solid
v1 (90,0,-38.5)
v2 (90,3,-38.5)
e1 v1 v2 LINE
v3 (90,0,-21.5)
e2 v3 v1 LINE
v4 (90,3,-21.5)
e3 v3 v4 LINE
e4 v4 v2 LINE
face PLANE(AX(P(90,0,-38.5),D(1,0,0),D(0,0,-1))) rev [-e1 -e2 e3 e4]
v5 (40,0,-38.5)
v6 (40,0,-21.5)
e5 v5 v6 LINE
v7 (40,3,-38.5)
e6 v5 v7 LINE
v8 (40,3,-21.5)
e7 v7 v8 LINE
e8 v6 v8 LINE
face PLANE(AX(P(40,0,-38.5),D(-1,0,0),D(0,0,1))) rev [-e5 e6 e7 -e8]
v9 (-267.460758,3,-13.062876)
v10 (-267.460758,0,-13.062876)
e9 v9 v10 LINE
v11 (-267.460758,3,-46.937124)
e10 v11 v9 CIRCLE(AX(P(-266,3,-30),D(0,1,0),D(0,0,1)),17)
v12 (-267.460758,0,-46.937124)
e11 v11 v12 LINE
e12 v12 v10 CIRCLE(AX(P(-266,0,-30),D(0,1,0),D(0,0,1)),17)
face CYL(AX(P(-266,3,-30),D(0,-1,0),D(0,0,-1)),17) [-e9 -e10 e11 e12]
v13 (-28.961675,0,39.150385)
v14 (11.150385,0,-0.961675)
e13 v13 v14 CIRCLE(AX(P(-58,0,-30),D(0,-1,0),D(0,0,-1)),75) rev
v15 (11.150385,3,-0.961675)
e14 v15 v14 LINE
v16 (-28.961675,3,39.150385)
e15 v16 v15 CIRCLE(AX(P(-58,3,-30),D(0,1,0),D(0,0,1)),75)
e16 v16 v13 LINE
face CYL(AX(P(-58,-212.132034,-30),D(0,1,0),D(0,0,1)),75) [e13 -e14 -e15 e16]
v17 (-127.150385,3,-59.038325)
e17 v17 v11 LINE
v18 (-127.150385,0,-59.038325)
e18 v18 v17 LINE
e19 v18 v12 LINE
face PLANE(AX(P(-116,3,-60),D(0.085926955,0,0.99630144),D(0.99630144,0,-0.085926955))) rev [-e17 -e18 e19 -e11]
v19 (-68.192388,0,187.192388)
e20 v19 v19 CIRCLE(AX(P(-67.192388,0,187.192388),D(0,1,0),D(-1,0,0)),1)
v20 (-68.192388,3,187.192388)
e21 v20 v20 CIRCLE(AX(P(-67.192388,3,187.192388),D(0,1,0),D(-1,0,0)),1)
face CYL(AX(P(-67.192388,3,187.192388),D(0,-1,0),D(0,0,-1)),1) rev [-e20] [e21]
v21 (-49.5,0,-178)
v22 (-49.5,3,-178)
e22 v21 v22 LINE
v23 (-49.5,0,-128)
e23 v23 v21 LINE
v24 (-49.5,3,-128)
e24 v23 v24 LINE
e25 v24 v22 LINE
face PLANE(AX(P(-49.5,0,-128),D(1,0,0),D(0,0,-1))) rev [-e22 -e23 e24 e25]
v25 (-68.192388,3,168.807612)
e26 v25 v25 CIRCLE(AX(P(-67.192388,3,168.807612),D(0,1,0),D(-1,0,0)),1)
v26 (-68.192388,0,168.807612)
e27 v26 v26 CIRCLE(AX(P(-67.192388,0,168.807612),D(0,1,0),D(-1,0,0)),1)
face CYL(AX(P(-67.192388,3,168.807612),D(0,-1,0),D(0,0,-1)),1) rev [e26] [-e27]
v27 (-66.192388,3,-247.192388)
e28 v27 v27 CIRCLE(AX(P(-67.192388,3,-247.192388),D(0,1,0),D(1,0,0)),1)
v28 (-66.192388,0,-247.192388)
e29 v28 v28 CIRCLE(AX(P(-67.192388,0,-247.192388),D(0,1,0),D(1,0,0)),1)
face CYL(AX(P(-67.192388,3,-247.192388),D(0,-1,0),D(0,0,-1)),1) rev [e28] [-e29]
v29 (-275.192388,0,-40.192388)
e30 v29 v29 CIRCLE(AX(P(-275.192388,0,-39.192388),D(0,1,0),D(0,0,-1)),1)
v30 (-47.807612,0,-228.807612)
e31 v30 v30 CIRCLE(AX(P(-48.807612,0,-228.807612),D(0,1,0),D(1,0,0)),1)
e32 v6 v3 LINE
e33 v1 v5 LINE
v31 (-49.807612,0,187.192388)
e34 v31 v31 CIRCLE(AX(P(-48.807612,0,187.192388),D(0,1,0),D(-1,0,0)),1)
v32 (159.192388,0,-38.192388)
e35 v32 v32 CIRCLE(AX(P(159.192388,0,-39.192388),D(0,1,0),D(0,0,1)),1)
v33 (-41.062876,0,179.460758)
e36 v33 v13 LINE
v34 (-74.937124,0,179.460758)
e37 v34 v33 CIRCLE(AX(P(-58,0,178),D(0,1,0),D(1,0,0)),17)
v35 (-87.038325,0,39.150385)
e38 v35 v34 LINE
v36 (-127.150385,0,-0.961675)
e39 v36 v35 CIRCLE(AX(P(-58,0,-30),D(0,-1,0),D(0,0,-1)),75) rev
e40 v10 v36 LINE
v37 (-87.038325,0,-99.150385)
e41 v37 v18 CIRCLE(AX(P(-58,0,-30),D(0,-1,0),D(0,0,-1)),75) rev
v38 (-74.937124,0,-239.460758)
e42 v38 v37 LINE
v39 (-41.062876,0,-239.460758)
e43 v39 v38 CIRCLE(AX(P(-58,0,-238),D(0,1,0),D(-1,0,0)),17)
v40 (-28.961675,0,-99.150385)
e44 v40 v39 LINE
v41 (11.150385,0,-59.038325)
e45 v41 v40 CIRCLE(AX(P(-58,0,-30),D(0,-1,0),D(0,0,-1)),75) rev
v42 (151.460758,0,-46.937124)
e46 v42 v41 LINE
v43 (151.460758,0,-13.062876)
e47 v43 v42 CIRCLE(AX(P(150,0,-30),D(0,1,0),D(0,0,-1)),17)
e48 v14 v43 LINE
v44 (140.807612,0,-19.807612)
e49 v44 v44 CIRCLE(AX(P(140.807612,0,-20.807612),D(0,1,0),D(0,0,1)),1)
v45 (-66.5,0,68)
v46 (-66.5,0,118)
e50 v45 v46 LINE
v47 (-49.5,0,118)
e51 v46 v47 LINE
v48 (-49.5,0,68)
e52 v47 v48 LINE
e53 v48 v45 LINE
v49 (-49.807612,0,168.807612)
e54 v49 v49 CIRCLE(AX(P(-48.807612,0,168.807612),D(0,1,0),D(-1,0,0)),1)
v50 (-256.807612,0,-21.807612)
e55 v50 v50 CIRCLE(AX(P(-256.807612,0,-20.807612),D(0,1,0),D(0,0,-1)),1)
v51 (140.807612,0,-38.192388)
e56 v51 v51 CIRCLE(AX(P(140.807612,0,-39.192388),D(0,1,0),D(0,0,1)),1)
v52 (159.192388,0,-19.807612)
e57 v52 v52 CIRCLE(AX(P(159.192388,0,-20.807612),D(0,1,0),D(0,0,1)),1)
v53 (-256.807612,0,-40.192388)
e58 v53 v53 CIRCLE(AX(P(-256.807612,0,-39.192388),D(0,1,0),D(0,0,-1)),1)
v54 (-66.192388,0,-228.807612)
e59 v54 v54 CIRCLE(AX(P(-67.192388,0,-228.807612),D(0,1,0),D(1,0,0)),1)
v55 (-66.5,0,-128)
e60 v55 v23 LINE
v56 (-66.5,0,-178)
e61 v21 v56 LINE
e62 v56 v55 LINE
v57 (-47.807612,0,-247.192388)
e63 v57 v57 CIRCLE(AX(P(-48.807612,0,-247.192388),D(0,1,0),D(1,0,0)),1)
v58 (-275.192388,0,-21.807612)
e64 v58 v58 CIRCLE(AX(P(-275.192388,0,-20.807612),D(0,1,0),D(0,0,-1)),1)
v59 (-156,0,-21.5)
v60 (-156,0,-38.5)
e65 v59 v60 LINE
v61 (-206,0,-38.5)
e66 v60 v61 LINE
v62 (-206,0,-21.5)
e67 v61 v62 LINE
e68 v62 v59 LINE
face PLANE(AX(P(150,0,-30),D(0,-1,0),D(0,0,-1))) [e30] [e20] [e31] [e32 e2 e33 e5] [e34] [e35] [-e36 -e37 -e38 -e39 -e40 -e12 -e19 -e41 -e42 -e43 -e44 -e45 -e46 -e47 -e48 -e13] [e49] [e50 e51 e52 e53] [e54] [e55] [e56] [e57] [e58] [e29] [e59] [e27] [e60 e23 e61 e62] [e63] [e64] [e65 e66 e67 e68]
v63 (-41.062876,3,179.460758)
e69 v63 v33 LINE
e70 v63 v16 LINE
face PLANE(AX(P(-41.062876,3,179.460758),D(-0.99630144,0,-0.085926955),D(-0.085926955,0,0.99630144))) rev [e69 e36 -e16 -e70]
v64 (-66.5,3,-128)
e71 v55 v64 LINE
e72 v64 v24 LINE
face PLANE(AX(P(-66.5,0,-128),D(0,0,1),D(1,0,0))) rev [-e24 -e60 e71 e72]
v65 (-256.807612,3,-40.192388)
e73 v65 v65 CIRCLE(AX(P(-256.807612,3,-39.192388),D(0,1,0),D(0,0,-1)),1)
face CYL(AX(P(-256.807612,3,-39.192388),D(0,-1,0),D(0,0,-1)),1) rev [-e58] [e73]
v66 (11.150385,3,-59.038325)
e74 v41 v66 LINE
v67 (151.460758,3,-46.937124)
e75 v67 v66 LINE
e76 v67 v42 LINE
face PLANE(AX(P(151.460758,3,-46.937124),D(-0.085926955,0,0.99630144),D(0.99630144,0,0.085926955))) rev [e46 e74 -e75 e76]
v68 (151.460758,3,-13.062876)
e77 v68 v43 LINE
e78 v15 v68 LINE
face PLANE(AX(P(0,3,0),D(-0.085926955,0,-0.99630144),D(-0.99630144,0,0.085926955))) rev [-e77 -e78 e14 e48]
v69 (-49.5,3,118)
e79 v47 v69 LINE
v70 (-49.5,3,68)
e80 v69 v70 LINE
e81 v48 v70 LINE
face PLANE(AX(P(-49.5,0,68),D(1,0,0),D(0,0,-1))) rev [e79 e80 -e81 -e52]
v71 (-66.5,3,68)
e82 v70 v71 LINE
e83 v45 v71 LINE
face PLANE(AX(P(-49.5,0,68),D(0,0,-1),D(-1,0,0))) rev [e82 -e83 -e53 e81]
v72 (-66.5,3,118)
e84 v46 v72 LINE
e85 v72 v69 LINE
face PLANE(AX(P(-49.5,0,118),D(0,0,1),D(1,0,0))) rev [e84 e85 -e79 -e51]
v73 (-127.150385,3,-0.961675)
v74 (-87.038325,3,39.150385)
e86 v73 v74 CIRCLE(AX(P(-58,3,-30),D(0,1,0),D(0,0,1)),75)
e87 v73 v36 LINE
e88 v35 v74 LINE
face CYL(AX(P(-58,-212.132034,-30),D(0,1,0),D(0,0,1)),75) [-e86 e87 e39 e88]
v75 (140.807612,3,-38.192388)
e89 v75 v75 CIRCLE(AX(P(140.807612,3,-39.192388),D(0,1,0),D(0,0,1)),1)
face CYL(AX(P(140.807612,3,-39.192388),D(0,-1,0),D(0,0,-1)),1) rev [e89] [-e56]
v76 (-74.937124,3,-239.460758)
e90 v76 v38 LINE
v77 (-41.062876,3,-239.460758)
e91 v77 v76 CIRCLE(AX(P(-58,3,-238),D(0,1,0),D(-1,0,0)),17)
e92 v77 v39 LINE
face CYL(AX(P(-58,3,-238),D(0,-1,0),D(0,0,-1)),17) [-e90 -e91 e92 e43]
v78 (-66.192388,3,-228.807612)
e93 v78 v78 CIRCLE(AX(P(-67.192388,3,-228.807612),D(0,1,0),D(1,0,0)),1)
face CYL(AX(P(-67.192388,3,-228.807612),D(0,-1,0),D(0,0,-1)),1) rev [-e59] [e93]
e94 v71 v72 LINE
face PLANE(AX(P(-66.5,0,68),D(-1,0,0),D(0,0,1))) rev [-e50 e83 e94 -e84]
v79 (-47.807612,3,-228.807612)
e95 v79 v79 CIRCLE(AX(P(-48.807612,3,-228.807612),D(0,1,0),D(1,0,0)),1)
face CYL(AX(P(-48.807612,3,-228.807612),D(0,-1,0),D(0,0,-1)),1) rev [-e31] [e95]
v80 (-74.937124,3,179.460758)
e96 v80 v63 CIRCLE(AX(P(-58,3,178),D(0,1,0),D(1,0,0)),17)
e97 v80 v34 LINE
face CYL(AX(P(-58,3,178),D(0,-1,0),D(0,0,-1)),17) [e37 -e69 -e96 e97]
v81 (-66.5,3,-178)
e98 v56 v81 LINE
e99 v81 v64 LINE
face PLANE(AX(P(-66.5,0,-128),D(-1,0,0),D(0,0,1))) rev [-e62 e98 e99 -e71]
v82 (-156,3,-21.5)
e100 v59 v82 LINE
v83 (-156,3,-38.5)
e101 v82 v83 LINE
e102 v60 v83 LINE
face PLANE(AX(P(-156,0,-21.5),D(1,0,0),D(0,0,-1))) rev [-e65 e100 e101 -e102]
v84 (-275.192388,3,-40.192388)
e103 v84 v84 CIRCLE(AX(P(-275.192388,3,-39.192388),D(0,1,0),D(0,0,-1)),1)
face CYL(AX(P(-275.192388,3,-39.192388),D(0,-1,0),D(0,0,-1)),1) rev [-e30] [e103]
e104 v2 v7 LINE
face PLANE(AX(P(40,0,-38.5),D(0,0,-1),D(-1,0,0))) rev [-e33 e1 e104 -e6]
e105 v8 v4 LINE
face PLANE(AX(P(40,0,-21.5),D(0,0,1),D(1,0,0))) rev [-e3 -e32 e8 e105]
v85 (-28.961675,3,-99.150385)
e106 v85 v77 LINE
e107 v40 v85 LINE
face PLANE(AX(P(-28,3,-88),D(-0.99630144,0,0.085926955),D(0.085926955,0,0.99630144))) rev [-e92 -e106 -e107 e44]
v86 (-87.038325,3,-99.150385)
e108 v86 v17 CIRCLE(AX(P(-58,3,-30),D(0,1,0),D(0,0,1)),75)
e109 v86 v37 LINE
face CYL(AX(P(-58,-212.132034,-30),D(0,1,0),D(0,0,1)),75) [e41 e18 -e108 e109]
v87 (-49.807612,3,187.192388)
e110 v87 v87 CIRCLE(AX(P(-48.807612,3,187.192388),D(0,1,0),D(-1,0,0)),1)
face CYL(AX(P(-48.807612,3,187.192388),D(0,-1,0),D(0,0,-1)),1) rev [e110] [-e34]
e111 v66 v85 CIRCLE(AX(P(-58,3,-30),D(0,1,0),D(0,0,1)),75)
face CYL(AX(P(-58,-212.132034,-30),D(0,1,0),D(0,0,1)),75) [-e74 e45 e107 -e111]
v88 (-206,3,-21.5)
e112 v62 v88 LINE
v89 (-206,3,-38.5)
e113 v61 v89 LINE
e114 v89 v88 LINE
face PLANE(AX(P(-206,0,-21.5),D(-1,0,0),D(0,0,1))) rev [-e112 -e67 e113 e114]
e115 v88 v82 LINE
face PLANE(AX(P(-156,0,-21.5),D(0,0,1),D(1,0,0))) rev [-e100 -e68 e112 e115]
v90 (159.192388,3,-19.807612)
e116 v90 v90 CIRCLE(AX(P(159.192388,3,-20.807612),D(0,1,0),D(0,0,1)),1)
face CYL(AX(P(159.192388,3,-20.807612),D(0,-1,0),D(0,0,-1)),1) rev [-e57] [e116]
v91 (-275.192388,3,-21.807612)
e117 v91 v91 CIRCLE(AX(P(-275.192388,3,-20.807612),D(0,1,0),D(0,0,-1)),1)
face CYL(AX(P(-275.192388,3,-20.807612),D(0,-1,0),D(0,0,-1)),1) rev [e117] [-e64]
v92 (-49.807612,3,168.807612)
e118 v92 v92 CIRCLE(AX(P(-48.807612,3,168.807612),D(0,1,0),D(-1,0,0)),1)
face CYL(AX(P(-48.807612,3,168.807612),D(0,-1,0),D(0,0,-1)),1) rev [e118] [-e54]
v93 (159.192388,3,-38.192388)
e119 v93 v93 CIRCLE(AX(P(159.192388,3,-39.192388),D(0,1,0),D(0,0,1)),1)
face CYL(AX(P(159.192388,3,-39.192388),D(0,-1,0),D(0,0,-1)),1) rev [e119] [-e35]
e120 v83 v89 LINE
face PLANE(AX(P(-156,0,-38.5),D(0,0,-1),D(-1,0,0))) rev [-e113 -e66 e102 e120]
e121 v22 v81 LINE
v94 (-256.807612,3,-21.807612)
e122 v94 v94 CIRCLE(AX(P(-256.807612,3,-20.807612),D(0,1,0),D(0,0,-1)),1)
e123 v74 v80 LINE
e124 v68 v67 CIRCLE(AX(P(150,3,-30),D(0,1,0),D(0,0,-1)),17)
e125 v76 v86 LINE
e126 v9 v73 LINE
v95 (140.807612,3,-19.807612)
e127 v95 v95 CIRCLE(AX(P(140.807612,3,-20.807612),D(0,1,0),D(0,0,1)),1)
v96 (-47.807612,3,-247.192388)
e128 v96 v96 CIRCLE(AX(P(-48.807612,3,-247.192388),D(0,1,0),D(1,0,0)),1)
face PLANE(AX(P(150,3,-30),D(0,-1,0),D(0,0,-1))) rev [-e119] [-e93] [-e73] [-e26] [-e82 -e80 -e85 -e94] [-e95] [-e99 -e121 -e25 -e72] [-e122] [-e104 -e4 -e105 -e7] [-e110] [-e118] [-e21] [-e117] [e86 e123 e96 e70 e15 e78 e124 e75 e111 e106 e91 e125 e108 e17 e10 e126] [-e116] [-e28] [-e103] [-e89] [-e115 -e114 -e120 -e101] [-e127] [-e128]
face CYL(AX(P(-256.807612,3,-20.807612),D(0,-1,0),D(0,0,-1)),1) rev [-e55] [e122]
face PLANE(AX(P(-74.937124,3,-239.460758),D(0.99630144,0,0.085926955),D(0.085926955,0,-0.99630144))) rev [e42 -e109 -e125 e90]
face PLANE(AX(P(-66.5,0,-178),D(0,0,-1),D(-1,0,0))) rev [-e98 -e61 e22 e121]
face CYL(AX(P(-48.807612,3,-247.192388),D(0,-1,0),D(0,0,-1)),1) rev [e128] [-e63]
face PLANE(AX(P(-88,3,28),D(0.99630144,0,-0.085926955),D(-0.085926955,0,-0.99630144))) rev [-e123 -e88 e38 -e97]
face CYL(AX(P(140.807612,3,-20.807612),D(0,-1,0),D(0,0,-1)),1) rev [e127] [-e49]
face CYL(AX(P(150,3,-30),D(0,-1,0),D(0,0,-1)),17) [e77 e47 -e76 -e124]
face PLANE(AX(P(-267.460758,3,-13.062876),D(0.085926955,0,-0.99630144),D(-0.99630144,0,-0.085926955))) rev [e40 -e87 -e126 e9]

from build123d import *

# Parameters (mm, degrees)
SKETCH1_R               = 1
BOSS_EXTRUDE1_DEPTH     = 3
SKETCH2_W               = 50
SKETCH2_H               = 17
CUT_EXTRUDE1_DEPTH      = 178.476759042
SKETCH3_R               = 75
BOSS_EXTRUDE2_DEPTH     = 3
CIRPATTERN1_OUTLINE_R   = 1
CIRPATTERN1_OUTLINE_W   = 17
CIRPATTERN1_OUTLINE_H   = 50
CIRPATTERN1_OUTLINE_W_2 = 50
CIRPATTERN1_OUTLINE_H_2 = 17
CIRPATTERN1_DEPTH       = 3


# Read off the part's stored shape, not the designer's step: CirPattern1
with BuildPart() as part:
    # Sketch1 → Boss-Extrude1 (new body)
    with BuildSketch(Plane(origin=(0, 0, 0), x_dir=(1, 0, 0), z_dir=(0, 1, 0))):
        with BuildLine():
            Line((0, 0), (151.460758228, 13.062875527))
            ThreePointArc((151.460758228, 13.062875527), (167, 30), (151.460758228, 46.937124473))
            Line((151.460758228, 46.937124473), (0, 60))
            Line((0, 60), (0, 0))
        make_face()
        with Locations(Location((140.807611845, 39.192388155, 0), (0, 0, 270))):
            Circle(SKETCH1_R, mode=Mode.SUBTRACT)
        with Locations(Location((140.807611845, 20.807611845, 0), (0, 0, 270))):
            Circle(SKETCH1_R, mode=Mode.SUBTRACT)
        with Locations(Location((159.192388155, 20.807611845, 0), (0, 0, 270))):
            Circle(SKETCH1_R, mode=Mode.SUBTRACT)
        with Locations(Location((159.192388155, 39.192388155, 0), (0, 0, 270))):
            Circle(SKETCH1_R, mode=Mode.SUBTRACT)
    extrude(amount=BOSS_EXTRUDE1_DEPTH)

    # Sketch2 → Cut-Extrude1 (cut, through all)
    with BuildSketch(Plane(origin=(0, 3, 0), x_dir=(1, 0, 0), z_dir=(0, 1, 0))):
        with Locations((65, 30)):
            Rectangle(SKETCH2_W, SKETCH2_H)
    extrude(amount=-CUT_EXTRUDE1_DEPTH, mode=Mode.SUBTRACT)

    # Sketch3 → Boss-Extrude2 (add)
    with BuildSketch(Plane(origin=(0, 3, 0), x_dir=(1, 0, 0), z_dir=(0, 1, 0))):
        with Locations((-58, 30)):
            Circle(SKETCH3_R)
    extrude(amount=-BOSS_EXTRUDE2_DEPTH)

    # CirPattern1 outline → CirPattern1 (add)
    # profile 1 of 3: a face of its own
    with BuildSketch(Plane(origin=(0, 0, 0), x_dir=(1, 0, 0), z_dir=(0, 1, 0))):
        with BuildLine():
            ThreePointArc((-28.961675415, -39.150384708), (-58, -45), (-87.038324585, -39.150384708))
            Line((-87.038324585, -39.150384708), (-74.937124473, -179.460758228))
            ThreePointArc((-74.937124473, -179.460758228), (-58, -195), (-41.062875527, -179.460758228))
            Line((-41.062875527, -179.460758228), (-28.961675415, -39.150384708))
        make_face()
        with Locations((-67.192388155, -187.192388155)):
            Circle(CIRPATTERN1_OUTLINE_R, mode=Mode.SUBTRACT)
        with Locations((-67.192388155, -168.807611845)):
            Circle(CIRPATTERN1_OUTLINE_R, mode=Mode.SUBTRACT)
        with Locations((-48.807611845, -187.192388155)):
            Circle(CIRPATTERN1_OUTLINE_R, mode=Mode.SUBTRACT)
        with Locations((-48.807611845, -168.807611845)):
            Circle(CIRPATTERN1_OUTLINE_R, mode=Mode.SUBTRACT)
        with Locations((-58, -93)):
            Rectangle(CIRPATTERN1_OUTLINE_W, CIRPATTERN1_OUTLINE_H, mode=Mode.SUBTRACT)
    # profile 2 of 3: a face of its own
    with BuildSketch(Plane(origin=(0, 0, 0), x_dir=(1, 0, 0), z_dir=(0, 1, 0))):
        with BuildLine():
            ThreePointArc((-127.150384708, 0.961675415), (-133, 30), (-127.150384708, 59.038324585))
            Line((-127.150384708, 59.038324585), (-267.460758228, 46.937124473))
            ThreePointArc((-267.460758228, 46.937124473), (-283, 30), (-267.460758228, 13.062875527))
            Line((-267.460758228, 13.062875527), (-127.150384708, 0.961675415))
        make_face()
        with Locations((-275.192388155, 20.807611845)):
            Circle(CIRPATTERN1_OUTLINE_R, mode=Mode.SUBTRACT)
        with Locations((-256.807611845, 20.807611845)):
            Circle(CIRPATTERN1_OUTLINE_R, mode=Mode.SUBTRACT)
        with Locations((-275.192388155, 39.192388155)):
            Circle(CIRPATTERN1_OUTLINE_R, mode=Mode.SUBTRACT)
        with Locations((-256.807611845, 39.192388155)):
            Circle(CIRPATTERN1_OUTLINE_R, mode=Mode.SUBTRACT)
        with Locations((-181, 30)):
            Rectangle(CIRPATTERN1_OUTLINE_W_2, CIRPATTERN1_OUTLINE_H_2, mode=Mode.SUBTRACT)
    # profile 3 of 3: a face of its own
    with BuildSketch(Plane(origin=(0, 0, 0), x_dir=(1, 0, 0), z_dir=(0, 1, 0))):
        with BuildLine():
            ThreePointArc((-41.062875527, 239.460758228), (-58, 255), (-74.937124473, 239.460758228))
            Line((-74.937124473, 239.460758228), (-87.038324585, 99.150384708))
            ThreePointArc((-87.038324585, 99.150384708), (-58, 105), (-28.961675415, 99.150384708))
            Line((-28.961675415, 99.150384708), (-41.062875527, 239.460758228))
        make_face()
        with Locations((-58, 153)):
            Rectangle(CIRPATTERN1_OUTLINE_W, CIRPATTERN1_OUTLINE_H, mode=Mode.SUBTRACT)
        with Locations((-67.192388155, 228.807611845)):
            Circle(CIRPATTERN1_OUTLINE_R, mode=Mode.SUBTRACT)
        with Locations((-67.192388155, 247.192388155)):
            Circle(CIRPATTERN1_OUTLINE_R, mode=Mode.SUBTRACT)
        with Locations((-48.807611845, 228.807611845)):
            Circle(CIRPATTERN1_OUTLINE_R, mode=Mode.SUBTRACT)
        with Locations((-48.807611845, 247.192388155)):
            Circle(CIRPATTERN1_OUTLINE_R, mode=Mode.SUBTRACT)
    extrude(amount=CIRPATTERN1_DEPTH)


solid = part.part
